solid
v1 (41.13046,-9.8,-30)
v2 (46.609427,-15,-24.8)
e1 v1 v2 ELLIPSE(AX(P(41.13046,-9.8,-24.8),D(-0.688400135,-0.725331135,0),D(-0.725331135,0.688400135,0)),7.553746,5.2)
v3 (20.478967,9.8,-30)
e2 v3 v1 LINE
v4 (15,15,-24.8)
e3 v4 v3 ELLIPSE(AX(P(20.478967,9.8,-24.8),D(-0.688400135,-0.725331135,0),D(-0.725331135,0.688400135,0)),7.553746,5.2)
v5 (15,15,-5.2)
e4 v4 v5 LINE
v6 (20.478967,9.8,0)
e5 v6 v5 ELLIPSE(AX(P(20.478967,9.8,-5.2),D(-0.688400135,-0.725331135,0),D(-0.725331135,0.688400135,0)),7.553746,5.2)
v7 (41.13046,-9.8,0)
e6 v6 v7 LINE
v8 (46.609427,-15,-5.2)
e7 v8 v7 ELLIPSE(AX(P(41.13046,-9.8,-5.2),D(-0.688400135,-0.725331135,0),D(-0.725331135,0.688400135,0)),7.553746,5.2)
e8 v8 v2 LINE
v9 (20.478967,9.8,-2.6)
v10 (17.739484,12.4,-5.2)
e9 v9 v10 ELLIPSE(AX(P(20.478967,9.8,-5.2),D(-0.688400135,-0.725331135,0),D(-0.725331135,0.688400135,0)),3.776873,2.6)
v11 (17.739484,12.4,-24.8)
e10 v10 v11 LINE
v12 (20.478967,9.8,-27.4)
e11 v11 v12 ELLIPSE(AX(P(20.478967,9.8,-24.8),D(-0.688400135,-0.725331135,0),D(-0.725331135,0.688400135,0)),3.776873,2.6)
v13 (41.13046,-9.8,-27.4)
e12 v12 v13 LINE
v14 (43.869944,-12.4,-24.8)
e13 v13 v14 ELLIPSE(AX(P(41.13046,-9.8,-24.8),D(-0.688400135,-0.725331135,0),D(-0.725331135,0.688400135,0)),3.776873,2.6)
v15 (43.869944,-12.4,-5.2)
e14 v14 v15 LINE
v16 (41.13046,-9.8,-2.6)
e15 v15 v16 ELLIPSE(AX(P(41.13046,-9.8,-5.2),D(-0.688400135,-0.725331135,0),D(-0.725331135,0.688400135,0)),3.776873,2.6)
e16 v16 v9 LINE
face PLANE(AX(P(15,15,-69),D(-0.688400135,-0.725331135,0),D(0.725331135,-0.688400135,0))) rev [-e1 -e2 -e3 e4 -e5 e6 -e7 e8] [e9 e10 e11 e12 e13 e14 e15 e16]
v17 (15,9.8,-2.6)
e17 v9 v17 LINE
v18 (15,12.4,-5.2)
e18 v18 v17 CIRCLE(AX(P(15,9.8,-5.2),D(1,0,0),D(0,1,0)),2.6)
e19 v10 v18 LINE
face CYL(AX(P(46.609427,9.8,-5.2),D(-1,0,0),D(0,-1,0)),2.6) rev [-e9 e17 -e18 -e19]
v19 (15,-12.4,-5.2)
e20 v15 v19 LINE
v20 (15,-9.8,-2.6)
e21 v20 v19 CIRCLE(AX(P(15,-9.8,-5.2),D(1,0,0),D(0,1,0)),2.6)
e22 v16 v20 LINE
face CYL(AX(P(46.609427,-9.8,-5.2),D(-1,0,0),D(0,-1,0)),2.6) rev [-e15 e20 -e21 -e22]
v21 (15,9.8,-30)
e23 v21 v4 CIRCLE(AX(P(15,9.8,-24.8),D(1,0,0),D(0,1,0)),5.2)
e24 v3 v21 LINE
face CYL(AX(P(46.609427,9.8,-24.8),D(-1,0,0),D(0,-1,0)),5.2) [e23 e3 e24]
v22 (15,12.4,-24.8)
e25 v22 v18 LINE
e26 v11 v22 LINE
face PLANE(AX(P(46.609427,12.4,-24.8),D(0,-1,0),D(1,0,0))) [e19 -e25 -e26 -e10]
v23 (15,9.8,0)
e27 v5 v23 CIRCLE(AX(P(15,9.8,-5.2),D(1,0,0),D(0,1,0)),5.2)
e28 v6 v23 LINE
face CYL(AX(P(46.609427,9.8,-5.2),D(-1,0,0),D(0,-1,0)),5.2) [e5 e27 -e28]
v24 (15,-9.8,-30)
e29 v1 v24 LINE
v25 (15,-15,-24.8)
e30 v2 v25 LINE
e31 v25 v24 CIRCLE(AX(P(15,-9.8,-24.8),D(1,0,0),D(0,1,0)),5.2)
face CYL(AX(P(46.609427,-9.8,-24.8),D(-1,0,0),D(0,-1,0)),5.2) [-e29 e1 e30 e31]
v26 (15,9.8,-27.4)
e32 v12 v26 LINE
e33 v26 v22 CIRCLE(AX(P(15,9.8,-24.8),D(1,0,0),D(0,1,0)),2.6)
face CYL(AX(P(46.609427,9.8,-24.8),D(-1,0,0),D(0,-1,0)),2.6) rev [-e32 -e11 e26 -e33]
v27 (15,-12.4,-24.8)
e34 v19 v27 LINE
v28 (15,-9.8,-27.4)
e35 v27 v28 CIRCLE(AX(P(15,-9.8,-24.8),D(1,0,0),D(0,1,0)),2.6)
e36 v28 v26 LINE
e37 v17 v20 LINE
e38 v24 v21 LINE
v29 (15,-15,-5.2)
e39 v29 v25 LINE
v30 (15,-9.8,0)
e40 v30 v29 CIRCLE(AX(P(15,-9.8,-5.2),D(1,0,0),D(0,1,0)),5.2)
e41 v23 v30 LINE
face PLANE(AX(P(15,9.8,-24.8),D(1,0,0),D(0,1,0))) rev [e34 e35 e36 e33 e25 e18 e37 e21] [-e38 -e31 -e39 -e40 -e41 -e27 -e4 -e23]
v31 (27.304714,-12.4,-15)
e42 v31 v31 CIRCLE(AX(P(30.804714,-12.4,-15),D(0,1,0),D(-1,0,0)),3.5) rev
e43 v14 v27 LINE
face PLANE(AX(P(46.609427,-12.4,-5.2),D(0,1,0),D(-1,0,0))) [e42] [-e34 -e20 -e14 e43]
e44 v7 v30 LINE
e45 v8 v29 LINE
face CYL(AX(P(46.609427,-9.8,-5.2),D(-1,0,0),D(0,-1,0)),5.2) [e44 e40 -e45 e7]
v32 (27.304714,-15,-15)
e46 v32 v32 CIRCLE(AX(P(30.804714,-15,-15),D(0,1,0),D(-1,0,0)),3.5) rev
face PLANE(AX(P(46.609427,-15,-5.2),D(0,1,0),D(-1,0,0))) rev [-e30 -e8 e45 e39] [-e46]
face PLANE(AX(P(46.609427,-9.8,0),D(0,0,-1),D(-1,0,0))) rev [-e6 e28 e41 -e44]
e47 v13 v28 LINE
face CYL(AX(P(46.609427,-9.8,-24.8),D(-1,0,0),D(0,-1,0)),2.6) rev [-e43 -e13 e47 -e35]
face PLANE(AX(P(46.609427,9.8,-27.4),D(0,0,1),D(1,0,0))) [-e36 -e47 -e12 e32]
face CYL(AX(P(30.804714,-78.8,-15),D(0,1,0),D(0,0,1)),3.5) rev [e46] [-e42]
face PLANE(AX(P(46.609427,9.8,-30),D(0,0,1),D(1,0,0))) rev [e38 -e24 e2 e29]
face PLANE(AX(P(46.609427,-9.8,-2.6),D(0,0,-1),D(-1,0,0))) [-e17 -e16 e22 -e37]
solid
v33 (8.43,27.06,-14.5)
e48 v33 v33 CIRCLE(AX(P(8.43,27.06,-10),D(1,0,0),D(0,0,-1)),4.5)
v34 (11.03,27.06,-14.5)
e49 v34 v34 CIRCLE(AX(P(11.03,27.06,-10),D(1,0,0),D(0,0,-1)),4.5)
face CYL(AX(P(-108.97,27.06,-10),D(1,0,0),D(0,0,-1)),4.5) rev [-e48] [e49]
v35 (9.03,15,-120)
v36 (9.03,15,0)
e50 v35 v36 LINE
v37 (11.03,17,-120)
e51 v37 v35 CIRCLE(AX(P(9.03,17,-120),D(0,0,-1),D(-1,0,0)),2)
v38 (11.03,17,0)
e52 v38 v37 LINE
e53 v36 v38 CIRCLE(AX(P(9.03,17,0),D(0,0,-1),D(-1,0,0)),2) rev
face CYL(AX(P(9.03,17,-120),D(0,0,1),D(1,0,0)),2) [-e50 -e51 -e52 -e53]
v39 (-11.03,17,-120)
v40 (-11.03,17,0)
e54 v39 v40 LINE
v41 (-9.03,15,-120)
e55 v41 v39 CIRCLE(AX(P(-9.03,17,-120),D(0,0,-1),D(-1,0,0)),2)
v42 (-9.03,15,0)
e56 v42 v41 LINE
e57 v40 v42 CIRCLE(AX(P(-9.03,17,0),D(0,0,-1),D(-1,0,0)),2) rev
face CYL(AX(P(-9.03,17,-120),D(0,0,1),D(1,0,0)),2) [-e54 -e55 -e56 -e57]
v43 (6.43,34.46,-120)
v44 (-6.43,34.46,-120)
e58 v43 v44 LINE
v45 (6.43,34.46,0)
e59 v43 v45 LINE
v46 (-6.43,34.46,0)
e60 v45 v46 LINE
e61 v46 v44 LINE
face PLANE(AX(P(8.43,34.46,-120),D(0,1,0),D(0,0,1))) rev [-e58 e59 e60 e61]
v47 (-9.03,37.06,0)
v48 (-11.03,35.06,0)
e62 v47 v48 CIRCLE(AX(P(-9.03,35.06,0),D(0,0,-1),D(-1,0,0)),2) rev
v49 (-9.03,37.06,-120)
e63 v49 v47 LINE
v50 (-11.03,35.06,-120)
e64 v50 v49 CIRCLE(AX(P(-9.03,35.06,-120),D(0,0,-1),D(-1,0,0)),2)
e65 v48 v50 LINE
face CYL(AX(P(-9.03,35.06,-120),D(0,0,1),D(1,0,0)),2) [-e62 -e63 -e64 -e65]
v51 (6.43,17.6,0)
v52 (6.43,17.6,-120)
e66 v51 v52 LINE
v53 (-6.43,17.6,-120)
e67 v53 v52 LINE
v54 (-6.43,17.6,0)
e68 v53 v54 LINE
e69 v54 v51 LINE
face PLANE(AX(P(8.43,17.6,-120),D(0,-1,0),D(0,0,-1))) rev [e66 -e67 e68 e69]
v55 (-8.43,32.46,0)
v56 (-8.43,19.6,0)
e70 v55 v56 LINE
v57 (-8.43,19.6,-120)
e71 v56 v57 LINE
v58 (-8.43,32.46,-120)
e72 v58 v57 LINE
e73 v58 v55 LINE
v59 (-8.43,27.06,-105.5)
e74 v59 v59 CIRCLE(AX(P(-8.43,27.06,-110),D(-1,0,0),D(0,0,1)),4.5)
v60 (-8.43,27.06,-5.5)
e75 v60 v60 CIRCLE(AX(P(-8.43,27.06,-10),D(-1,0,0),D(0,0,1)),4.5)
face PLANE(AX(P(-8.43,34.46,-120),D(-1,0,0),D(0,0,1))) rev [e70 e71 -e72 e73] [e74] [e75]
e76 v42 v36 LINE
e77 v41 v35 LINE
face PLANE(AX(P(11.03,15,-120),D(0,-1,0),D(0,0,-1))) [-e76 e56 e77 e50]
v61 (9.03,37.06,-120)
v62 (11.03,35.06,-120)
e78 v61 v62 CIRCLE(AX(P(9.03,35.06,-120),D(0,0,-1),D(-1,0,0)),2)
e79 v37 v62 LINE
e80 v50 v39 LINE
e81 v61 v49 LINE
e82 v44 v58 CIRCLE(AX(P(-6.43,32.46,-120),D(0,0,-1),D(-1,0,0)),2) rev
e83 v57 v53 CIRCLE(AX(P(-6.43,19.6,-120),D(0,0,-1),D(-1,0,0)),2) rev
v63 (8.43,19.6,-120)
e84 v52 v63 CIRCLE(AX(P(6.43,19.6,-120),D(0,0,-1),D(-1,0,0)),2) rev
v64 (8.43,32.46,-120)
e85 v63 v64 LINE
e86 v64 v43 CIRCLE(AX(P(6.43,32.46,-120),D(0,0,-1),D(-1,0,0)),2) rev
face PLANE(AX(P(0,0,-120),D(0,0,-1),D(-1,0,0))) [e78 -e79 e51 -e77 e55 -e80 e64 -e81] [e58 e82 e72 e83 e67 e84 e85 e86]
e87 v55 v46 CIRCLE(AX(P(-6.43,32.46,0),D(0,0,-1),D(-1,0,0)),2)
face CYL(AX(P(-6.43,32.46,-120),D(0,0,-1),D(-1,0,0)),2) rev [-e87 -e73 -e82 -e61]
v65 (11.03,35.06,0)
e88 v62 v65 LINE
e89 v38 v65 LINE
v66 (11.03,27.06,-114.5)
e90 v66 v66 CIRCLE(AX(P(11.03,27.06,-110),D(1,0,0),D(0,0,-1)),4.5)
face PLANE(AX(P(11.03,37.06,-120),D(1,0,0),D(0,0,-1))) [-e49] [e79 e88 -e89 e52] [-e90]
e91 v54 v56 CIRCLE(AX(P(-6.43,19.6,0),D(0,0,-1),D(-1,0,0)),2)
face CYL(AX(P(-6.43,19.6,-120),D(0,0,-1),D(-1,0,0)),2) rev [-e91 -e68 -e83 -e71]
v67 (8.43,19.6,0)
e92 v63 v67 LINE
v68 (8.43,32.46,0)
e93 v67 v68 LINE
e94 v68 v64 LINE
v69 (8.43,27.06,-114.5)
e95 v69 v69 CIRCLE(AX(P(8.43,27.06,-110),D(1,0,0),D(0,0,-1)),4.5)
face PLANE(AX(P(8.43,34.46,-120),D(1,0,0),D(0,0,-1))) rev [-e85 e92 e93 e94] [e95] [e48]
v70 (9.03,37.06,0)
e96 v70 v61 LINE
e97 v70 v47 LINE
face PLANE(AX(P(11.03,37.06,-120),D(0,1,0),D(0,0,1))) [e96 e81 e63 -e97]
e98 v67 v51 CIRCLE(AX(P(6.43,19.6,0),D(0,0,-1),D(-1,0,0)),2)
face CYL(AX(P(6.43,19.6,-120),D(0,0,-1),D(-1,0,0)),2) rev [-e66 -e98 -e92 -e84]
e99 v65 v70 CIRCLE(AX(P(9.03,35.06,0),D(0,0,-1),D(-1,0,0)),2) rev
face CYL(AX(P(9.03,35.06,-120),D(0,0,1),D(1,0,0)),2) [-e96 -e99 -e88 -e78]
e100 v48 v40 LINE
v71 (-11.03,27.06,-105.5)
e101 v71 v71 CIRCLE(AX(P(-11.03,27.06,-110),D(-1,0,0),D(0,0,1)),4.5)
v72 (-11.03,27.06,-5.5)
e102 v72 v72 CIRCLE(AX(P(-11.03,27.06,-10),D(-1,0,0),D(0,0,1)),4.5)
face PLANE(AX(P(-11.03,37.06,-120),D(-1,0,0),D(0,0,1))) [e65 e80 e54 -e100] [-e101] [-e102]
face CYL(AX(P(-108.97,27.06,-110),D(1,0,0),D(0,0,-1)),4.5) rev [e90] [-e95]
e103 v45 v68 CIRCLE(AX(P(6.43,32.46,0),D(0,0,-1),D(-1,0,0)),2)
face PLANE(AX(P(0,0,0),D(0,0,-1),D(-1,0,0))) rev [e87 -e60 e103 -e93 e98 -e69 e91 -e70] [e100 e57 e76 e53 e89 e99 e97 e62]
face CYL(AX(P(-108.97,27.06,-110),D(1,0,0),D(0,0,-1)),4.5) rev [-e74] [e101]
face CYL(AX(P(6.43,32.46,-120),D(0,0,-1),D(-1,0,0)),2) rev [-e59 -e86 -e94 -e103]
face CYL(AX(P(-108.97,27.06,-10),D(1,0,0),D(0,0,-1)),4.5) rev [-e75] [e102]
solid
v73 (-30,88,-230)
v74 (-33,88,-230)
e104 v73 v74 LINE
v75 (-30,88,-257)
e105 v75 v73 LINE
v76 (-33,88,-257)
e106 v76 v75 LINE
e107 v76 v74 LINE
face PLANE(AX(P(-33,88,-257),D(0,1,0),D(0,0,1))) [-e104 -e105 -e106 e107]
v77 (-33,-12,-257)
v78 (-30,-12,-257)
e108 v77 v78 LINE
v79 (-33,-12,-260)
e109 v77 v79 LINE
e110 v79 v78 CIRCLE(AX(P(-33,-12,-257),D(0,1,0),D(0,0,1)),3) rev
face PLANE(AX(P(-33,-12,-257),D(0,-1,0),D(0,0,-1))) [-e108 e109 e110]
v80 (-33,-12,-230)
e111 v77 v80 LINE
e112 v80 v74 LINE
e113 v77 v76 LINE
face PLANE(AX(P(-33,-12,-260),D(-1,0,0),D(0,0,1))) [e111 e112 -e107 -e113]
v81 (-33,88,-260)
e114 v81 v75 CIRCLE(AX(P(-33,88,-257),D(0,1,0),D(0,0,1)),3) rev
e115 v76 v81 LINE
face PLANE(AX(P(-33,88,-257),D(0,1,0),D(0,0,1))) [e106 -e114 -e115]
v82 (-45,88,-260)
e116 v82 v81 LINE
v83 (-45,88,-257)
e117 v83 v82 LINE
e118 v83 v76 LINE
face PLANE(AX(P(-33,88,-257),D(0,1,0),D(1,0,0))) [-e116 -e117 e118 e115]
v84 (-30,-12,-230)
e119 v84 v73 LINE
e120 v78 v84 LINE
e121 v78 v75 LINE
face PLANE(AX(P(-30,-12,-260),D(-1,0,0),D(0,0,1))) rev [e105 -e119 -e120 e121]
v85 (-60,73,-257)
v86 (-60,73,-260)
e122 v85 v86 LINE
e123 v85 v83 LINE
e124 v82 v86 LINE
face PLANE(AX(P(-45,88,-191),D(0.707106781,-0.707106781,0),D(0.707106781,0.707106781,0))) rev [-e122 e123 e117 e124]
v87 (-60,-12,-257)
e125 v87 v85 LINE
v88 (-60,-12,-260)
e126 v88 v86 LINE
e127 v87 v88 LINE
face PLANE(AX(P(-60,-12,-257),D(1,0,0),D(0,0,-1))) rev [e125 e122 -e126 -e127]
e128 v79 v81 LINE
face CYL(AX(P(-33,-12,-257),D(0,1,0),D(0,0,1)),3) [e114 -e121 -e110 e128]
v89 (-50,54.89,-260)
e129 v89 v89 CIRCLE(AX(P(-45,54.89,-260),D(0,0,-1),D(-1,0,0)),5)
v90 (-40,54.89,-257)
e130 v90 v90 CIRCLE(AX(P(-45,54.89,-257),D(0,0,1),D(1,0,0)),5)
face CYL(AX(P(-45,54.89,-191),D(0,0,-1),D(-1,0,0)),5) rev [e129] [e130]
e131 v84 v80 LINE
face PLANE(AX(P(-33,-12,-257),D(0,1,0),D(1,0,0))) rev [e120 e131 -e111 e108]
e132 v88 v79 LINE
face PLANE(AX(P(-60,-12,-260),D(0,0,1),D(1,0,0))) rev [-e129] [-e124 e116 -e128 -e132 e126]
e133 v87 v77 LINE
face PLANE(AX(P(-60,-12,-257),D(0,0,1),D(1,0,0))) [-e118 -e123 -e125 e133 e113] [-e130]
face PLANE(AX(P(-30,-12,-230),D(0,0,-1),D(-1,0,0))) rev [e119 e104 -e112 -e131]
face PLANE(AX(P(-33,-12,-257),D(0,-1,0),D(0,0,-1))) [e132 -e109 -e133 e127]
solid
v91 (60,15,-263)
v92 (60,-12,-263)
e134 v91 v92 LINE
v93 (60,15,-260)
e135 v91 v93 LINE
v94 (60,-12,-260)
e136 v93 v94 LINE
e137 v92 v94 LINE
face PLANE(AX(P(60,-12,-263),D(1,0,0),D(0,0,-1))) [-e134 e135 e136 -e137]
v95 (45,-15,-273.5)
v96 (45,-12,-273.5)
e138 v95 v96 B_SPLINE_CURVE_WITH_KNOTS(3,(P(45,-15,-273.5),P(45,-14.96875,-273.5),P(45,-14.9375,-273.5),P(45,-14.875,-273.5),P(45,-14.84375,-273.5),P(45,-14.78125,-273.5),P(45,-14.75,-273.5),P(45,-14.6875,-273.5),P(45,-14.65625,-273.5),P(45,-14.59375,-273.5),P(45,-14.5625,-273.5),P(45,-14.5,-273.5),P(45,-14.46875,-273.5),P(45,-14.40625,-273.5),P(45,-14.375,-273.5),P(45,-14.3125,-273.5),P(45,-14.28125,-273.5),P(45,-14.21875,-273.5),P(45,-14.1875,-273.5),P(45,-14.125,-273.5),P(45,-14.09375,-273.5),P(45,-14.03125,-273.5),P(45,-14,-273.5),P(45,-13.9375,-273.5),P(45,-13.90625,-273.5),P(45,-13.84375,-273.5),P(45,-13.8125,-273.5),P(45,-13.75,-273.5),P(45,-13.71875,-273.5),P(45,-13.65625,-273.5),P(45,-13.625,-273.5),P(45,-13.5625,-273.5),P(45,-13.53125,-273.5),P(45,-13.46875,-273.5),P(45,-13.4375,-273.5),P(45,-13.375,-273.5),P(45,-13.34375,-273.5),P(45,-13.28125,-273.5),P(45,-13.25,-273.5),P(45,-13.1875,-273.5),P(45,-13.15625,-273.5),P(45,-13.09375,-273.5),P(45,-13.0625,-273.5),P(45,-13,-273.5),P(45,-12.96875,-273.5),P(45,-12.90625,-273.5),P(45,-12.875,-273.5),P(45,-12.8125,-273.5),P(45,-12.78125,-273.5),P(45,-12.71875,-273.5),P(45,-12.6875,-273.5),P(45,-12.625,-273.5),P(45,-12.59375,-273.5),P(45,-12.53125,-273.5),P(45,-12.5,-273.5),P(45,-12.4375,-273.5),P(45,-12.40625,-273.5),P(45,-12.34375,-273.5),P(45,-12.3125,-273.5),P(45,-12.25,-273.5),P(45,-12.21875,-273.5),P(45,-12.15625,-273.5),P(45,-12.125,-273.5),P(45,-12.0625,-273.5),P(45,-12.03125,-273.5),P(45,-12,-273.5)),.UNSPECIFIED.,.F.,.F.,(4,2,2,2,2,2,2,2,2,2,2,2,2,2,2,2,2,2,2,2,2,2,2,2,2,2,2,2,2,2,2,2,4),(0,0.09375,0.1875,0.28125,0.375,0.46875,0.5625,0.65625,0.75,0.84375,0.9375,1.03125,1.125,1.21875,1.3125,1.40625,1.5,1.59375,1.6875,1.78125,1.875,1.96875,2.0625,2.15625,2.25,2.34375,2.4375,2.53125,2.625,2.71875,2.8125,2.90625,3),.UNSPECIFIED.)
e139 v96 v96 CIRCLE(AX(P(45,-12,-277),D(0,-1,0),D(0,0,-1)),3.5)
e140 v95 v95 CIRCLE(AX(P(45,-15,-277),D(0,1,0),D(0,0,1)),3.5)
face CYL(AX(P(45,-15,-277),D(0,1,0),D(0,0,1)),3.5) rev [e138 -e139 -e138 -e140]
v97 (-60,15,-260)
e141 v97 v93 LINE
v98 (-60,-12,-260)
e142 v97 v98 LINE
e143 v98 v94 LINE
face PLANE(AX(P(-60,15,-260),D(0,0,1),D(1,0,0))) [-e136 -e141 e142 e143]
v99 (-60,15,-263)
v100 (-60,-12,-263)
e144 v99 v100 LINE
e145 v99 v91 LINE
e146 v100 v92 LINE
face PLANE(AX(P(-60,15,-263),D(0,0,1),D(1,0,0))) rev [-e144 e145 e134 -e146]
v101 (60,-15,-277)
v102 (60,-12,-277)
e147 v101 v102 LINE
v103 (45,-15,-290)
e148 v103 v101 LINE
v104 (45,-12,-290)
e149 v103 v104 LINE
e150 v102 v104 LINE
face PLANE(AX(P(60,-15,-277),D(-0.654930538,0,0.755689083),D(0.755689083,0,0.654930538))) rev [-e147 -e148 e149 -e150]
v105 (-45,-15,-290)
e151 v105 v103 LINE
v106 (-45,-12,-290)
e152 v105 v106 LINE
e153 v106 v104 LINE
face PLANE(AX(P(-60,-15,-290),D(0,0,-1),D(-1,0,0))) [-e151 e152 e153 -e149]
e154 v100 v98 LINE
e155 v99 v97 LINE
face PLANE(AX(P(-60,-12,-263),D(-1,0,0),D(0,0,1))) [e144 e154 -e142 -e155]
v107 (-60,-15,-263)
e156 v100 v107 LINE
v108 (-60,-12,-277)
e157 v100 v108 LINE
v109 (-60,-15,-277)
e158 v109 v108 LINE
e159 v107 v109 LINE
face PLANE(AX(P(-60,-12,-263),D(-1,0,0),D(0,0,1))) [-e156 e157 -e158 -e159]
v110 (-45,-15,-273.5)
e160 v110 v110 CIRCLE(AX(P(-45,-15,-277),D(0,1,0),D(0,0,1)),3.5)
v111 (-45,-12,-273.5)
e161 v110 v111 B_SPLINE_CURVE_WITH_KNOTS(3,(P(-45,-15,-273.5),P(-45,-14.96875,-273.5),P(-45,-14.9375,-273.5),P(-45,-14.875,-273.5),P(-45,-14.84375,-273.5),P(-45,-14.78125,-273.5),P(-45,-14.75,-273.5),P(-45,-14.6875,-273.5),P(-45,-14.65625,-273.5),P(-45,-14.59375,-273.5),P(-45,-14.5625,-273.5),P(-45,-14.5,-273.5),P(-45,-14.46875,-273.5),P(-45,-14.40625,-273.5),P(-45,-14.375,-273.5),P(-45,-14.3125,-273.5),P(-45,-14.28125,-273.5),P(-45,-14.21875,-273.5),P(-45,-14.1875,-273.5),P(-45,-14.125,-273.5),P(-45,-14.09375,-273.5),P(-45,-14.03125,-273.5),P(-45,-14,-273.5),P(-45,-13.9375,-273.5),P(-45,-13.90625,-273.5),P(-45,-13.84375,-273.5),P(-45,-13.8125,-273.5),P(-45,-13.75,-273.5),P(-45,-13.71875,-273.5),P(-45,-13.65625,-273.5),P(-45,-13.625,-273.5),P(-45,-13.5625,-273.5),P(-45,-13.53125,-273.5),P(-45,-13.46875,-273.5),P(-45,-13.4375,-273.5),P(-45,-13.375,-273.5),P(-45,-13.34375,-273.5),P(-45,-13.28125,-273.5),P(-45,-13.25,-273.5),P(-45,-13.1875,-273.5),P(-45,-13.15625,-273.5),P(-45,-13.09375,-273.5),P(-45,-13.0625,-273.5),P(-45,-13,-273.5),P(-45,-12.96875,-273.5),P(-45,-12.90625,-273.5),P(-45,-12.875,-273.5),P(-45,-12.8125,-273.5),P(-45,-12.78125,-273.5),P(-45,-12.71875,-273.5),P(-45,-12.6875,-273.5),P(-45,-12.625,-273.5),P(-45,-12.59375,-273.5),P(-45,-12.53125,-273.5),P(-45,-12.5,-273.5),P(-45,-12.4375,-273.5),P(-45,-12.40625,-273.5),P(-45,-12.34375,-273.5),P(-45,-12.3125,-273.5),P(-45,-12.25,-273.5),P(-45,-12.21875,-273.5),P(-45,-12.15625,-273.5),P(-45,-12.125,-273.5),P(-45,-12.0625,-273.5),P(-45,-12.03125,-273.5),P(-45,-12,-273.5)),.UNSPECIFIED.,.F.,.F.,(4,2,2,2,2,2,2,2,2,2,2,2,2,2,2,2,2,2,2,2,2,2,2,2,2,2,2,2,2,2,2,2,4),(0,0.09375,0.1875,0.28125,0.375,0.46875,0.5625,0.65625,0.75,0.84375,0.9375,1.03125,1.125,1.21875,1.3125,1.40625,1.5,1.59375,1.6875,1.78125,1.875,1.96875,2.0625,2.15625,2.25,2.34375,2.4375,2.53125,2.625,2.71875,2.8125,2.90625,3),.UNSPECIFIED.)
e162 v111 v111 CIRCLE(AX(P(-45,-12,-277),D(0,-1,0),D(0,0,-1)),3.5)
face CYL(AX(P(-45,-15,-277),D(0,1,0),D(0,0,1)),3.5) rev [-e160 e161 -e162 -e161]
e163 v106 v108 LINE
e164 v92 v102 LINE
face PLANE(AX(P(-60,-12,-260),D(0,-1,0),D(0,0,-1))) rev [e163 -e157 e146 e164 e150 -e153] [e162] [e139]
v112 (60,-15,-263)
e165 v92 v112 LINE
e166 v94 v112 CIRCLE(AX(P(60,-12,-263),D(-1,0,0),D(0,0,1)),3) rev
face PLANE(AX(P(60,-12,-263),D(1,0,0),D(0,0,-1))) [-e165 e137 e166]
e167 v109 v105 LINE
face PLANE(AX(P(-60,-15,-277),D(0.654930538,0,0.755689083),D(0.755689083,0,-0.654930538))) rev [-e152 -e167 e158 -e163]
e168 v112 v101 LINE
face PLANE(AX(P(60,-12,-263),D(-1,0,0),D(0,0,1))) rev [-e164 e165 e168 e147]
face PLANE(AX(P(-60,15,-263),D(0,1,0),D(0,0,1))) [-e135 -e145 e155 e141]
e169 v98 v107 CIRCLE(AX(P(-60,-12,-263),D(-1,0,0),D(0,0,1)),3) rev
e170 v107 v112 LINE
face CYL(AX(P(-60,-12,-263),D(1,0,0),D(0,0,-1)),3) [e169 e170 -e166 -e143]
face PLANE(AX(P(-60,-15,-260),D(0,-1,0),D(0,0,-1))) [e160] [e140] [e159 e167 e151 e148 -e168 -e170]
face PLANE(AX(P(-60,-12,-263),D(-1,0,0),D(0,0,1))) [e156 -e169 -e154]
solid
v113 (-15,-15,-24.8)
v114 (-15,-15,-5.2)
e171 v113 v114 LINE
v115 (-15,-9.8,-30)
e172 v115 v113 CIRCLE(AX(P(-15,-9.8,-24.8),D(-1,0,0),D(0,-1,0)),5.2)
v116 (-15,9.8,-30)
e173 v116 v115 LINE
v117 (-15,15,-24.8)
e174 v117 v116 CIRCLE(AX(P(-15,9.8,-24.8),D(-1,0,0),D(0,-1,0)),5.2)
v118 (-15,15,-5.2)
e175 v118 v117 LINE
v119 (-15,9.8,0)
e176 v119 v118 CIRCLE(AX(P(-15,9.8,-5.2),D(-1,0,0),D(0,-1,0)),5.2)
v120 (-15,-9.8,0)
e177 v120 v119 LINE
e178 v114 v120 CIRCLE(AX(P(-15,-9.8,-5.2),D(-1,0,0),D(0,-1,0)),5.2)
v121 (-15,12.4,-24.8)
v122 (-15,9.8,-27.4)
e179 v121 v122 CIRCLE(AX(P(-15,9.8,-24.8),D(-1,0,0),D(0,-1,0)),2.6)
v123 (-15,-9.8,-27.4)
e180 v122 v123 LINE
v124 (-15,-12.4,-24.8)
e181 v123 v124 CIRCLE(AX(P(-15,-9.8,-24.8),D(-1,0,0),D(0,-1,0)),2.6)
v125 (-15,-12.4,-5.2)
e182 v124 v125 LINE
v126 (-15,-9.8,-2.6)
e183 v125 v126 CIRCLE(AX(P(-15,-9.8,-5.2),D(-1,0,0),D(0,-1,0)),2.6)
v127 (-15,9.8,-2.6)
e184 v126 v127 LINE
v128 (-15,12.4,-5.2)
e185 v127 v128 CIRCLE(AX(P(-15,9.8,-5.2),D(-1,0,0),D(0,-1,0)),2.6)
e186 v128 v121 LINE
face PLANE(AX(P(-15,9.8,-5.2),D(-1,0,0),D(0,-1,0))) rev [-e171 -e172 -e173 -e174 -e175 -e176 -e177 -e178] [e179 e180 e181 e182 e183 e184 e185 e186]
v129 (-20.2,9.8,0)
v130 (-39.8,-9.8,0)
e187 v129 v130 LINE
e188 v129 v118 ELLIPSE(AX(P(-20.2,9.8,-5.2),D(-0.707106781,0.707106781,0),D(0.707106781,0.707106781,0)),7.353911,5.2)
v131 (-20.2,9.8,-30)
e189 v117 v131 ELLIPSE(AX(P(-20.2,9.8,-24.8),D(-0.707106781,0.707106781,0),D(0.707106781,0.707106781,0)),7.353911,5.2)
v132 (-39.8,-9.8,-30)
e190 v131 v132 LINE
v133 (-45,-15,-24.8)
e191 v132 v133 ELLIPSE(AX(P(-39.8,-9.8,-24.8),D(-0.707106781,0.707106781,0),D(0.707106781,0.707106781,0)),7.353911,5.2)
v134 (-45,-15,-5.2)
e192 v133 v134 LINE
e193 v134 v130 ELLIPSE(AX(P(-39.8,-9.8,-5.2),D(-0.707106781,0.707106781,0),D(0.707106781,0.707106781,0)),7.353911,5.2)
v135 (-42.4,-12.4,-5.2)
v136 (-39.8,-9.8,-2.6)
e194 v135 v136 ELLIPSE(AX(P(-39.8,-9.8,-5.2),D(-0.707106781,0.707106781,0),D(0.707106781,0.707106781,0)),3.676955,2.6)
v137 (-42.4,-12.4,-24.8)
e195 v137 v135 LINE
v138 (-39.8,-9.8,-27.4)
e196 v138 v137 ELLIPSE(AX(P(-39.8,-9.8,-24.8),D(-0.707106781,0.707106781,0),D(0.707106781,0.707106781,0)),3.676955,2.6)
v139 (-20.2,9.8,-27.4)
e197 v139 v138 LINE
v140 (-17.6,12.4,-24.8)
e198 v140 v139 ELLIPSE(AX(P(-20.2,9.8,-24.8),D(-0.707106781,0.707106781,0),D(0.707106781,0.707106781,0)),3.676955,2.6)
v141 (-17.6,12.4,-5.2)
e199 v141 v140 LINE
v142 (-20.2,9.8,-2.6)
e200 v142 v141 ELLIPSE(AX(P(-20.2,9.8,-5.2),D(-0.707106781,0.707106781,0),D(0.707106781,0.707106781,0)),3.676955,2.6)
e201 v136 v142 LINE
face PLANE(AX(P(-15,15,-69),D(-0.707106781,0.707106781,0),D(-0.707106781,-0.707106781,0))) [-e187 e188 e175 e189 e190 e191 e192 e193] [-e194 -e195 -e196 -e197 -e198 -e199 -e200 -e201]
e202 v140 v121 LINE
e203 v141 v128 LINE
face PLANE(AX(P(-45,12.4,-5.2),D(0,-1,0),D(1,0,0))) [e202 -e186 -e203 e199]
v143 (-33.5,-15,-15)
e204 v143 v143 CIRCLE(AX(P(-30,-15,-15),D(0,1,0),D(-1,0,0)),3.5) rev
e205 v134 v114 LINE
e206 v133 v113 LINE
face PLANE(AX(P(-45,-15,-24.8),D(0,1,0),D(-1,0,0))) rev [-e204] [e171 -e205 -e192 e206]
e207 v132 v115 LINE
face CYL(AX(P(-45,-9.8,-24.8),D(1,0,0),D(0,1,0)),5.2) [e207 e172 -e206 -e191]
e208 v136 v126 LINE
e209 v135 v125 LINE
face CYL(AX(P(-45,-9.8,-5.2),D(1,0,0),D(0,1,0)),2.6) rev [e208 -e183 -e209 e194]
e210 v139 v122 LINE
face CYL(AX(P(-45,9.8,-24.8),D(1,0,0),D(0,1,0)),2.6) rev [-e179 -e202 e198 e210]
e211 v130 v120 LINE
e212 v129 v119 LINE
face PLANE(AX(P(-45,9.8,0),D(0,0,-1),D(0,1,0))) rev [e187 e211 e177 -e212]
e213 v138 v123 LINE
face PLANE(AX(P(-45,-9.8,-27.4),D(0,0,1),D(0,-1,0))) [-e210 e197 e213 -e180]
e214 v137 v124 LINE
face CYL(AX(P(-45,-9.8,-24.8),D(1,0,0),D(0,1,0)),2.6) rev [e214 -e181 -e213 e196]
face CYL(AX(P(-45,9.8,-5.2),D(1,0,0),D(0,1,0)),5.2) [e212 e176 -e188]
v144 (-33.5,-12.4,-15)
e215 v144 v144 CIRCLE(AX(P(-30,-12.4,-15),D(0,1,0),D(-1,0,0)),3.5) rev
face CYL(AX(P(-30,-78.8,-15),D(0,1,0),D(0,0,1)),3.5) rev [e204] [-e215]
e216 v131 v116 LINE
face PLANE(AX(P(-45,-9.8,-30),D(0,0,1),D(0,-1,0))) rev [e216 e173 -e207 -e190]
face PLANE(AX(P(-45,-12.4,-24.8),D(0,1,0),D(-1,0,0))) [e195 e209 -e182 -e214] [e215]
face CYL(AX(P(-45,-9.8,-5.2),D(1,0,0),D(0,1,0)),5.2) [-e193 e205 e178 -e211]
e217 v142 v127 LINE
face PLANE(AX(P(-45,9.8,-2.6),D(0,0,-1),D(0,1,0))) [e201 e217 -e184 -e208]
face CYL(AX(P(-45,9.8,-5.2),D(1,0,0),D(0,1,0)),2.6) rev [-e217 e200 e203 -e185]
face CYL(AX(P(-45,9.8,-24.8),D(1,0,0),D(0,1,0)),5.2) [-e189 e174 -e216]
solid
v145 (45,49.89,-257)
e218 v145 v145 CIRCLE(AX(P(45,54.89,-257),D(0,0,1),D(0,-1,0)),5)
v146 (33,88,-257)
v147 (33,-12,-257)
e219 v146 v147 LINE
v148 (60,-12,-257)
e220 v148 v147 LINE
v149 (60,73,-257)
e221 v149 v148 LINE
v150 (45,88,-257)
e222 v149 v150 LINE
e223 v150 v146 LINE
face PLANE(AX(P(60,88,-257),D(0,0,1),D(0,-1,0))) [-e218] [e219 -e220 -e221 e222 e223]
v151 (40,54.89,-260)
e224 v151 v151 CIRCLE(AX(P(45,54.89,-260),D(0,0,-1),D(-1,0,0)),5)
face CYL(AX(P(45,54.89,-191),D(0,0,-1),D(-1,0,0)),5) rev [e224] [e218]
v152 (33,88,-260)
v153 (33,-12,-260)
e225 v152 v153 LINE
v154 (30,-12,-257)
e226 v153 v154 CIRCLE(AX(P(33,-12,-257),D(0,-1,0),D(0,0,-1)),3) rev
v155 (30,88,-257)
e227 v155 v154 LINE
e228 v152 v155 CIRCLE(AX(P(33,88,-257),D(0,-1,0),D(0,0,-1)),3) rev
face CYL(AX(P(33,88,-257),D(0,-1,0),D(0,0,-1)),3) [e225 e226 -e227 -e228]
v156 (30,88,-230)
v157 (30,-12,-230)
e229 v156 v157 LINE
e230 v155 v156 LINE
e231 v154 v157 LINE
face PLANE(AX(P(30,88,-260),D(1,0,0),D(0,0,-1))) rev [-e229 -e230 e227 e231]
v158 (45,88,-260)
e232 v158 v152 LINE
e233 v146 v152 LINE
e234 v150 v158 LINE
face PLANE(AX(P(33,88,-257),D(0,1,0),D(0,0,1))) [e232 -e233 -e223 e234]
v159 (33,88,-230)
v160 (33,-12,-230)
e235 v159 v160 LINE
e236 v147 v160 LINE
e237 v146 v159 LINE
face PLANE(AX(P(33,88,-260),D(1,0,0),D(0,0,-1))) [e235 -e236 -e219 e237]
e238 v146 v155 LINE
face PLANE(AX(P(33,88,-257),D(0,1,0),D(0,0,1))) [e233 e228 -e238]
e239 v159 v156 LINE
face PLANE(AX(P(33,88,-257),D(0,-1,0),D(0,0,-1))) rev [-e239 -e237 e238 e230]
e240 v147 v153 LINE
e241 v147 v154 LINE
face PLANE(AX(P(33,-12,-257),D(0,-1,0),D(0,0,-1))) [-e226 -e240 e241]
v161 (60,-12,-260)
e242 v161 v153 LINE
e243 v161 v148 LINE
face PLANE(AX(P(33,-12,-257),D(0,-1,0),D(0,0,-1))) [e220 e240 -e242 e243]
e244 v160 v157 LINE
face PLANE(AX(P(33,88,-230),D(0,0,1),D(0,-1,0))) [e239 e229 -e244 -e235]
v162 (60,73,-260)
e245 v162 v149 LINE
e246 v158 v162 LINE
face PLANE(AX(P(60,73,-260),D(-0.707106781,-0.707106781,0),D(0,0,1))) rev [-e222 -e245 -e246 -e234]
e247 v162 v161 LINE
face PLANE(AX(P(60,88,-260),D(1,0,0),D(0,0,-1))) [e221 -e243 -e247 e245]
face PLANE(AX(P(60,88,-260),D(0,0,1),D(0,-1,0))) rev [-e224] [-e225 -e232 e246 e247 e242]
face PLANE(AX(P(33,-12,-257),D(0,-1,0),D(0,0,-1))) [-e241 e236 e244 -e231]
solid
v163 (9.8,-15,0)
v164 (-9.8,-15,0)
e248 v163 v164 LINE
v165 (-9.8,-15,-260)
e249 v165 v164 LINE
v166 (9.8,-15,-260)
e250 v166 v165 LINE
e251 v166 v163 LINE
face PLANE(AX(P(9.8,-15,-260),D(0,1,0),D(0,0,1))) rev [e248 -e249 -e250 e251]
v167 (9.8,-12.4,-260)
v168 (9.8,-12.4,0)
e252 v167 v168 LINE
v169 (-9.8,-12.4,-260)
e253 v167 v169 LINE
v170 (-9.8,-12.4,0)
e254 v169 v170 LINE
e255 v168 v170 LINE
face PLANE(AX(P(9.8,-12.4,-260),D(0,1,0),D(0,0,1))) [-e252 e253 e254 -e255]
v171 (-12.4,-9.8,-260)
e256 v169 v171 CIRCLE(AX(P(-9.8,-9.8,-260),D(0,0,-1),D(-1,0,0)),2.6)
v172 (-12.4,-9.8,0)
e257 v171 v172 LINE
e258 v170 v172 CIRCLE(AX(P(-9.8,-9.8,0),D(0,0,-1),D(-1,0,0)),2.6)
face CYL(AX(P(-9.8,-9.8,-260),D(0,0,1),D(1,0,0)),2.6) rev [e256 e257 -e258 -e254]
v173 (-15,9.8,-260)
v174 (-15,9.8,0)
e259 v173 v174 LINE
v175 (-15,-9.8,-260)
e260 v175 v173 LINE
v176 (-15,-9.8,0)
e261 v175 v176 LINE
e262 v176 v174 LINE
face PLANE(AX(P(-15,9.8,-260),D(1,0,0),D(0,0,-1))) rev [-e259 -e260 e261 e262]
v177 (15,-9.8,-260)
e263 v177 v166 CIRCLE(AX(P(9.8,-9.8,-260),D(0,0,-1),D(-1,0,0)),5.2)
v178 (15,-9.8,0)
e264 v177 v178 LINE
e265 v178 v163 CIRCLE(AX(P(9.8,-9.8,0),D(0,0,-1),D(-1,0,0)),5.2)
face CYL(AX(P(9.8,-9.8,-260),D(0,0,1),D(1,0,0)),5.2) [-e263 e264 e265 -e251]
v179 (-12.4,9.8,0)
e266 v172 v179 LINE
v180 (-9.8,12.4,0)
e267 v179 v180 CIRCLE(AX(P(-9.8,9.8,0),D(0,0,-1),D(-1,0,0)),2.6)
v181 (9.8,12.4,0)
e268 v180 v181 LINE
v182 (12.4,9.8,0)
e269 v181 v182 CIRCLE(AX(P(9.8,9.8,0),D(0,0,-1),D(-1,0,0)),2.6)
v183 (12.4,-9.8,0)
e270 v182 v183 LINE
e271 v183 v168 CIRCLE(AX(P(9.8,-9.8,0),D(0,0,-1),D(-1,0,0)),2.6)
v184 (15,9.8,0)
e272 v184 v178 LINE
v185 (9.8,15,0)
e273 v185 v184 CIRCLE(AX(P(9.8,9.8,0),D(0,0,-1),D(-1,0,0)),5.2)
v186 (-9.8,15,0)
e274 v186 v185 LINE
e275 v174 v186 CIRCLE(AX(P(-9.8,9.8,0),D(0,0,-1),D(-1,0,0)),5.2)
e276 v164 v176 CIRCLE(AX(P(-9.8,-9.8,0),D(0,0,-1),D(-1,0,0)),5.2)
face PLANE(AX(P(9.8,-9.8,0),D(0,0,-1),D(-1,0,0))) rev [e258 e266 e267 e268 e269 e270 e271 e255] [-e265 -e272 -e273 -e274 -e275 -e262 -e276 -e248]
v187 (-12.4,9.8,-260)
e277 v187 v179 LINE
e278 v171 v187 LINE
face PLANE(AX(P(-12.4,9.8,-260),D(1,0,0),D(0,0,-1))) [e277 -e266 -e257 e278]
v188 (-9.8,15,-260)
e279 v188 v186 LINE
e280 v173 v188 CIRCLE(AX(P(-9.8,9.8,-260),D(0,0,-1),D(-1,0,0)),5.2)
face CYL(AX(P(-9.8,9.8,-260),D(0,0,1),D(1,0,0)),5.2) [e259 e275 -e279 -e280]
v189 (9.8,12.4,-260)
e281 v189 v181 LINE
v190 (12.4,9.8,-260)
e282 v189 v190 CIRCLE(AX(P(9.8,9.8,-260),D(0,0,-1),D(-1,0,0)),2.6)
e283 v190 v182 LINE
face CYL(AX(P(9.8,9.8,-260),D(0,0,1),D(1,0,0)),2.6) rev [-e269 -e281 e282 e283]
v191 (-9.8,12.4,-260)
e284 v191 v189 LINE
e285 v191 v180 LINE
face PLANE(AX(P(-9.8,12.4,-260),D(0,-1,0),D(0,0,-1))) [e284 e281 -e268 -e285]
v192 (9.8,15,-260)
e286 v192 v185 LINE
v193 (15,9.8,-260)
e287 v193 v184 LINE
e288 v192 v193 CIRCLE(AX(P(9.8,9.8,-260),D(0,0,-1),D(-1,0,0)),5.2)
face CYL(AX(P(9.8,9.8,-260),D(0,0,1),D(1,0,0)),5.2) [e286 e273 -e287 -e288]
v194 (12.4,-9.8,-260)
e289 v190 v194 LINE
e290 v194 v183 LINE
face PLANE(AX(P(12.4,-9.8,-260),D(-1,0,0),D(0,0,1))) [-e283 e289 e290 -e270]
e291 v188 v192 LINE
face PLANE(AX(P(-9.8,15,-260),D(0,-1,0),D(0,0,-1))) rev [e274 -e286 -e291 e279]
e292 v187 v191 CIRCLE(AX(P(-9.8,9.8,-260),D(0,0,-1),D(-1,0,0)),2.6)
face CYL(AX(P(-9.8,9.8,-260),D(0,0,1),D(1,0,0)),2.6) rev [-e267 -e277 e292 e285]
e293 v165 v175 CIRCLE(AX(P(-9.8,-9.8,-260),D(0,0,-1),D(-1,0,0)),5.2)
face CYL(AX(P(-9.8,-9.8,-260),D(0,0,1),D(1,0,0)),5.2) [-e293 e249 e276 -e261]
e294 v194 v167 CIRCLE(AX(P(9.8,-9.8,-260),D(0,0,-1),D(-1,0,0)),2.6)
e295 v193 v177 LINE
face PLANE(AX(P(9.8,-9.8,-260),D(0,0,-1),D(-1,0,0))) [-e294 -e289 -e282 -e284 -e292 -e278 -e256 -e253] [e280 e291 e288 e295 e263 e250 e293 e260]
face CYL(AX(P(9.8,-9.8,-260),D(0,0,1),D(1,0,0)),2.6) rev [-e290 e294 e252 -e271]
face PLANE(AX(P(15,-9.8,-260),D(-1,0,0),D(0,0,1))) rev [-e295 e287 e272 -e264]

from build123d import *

# Parameters (mm, degrees)
SQUARE_TUBE_30_X_30_X_2_6_1_DEPTH   = 260
SQUARE_TUBE_30_X_30_X_2_6_1_2_DEPTH = 120
SKETCH2_R                           = 4.5
CUT_EXTRUDE1_DEPTH                  = 69
SQUARE_TUBE_30_X_30_X_2_6_4_DEPTH   = 30
CUT_EXTRUDE2_DEPTH                  = 69
SQUARE_TUBE_30_X_30_X_2_6_5_DEPTH   = 31.609427342
CUT_EXTRUDE3_DEPTH                  = 69
SKETCH19_R                          = 3.5
CUT_EXTRUDE6_DEPTH                  = 69
BASE_FLANGE4_START                  = -75
BASE_FLANGE4_DEPTH                  = 120
CUT_EXTRUDE7_DEPTH                  = 69
CUT_EXTRUDE7_DEPTH_BACK             = 302.577519056
SKETCH38_R                          = 3.5
BASE_FLANGE5_START                  = -27
BASE_FLANGE5_DEPTH                  = 100
BASE_FLANGE8_DEPTH                  = 100
SKETCH56_R                          = 5
CUT_EXTRUDE9_DEPTH                  = 69
CUT_EXTRUDE10_DEPTH                 = 69
CHAMFER2_SIZE                       = 15
SKETCH63_R                          = 5
CUT_EXTRUDE11_DEPTH                 = 69
SKETCH64_W                          = 22.06
SKETCH64_H                          = 22.06
SKETCH64_W_2                        = 16.86
SKETCH64_H_2                        = 16.86
BOSS_EXTRUDE1_DEPTH                 = 120
FILLET2_R                           = 2
FILLET3_R                           = 2
SKETCH65_R                          = 4.5
CUT_EXTRUDE12_DEPTH                 = 120


# Read off the part's stored shape, not the designer's step: Base-Flange4, Base-Flange5, Base-Flange8
with BuildPart() as part:
    # Sketch1 → Square tube 30 X 30 X 2.6(1) (new body)
    with BuildSketch(Plane(origin=(0, 0, 0), x_dir=(1, 0, 0), z_dir=(0, 0, -1))):
        with BuildLine():
            Line((-9.8, -15), (9.8, -15))
            ThreePointArc((9.8, -15), (13.476955262, -13.476955262), (15, -9.8))
            Line((15, -9.8), (15, 9.8))
            ThreePointArc((15, 9.8), (13.476955262, 13.476955262), (9.8, 15))
            Line((9.8, 15), (-9.8, 15))
            ThreePointArc((-9.8, 15), (-13.476955262, 13.476955262), (-15, 9.8))
            Line((-15, 9.8), (-15, -9.8))
            ThreePointArc((-15, -9.8), (-13.476955262, -13.476955262), (-9.8, -15))
        make_face()
        with BuildLine():
            Line((-9.8, -12.4), (9.8, -12.4))
            ThreePointArc((9.8, -12.4), (11.638477631, -11.638477631), (12.4, -9.8))
            Line((12.4, -9.8), (12.4, 9.8))
            ThreePointArc((12.4, 9.8), (11.638477631, 11.638477631), (9.8, 12.4))
            Line((9.8, 12.4), (-9.8, 12.4))
            ThreePointArc((-9.8, 12.4), (-11.638477631, 11.638477631), (-12.4, 9.8))
            Line((-12.4, 9.8), (-12.4, -9.8))
            ThreePointArc((-12.4, -9.8), (-11.638477631, -11.638477631), (-9.8, -12.4))
        make_face(mode=Mode.SUBTRACT)
    extrude(amount=SQUARE_TUBE_30_X_30_X_2_6_1_DEPTH)


with BuildPart() as body_2:
    # Sketch1 on segment 2 (carried to segment 2) → Square tube 30 X 30 X 2.6_1 2 (new body)
    with BuildSketch(Plane(origin=(0, 30, 0), x_dir=(1, 0, 0), z_dir=(0, 0, -1))):
        with BuildLine():
            Line((-9.8, -15), (9.8, -15))
            ThreePointArc((9.8, -15), (13.476955262, -13.476955262), (15, -9.8))
            Line((15, -9.8), (15, 9.8))
            ThreePointArc((15, 9.8), (13.476955262, 13.476955262), (9.8, 15))
            Line((9.8, 15), (-9.8, 15))
            ThreePointArc((-9.8, 15), (-13.476955262, 13.476955262), (-15, 9.8))
            Line((-15, 9.8), (-15, -9.8))
            ThreePointArc((-15, -9.8), (-13.476955262, -13.476955262), (-9.8, -15))
        make_face()
        with BuildLine():
            Line((-9.8, -12.4), (9.8, -12.4))
            ThreePointArc((9.8, -12.4), (11.638477631, -11.638477631), (12.4, -9.8))
            Line((12.4, -9.8), (12.4, 9.8))
            ThreePointArc((12.4, 9.8), (11.638477631, 11.638477631), (9.8, 12.4))
            Line((9.8, 12.4), (-9.8, 12.4))
            ThreePointArc((-9.8, 12.4), (-11.638477631, 11.638477631), (-12.4, 9.8))
            Line((-12.4, 9.8), (-12.4, -9.8))
            ThreePointArc((-12.4, -9.8), (-11.638477631, -11.638477631), (-9.8, -12.4))
        make_face(mode=Mode.SUBTRACT)
    extrude(amount=SQUARE_TUBE_30_X_30_X_2_6_1_2_DEPTH)

    # Sketch2 → Cut-Extrude1 (cut)
    with BuildSketch(Plane.ZY.offset(15)):
        with Locations((-110, 35)):
            Circle(SKETCH2_R)
        with Locations((-10, 35)):
            Circle(SKETCH2_R)
    extrude(amount=-CUT_EXTRUDE1_DEPTH, mode=Mode.SUBTRACT)


with BuildPart() as body_3:
    # Sketch11 → Square tube 30 X 30 X 2.6(4) (new body)
    with BuildSketch(Plane(origin=(-15, 0, -15), x_dir=(0, 0, 1), z_dir=(-1, 0, 0))):
        with BuildLine():
            Line((-9.8, -15), (9.8, -15))
            ThreePointArc((9.8, -15), (13.476955262, -13.476955262), (15, -9.8))
            Line((15, -9.8), (15, 9.8))
            ThreePointArc((15, 9.8), (13.476955262, 13.476955262), (9.8, 15))
            Line((9.8, 15), (-9.8, 15))
            ThreePointArc((-9.8, 15), (-13.476955262, 13.476955262), (-15, 9.8))
            Line((-15, 9.8), (-15, -9.8))
            ThreePointArc((-15, -9.8), (-13.476955262, -13.476955262), (-9.8, -15))
        make_face()
        with BuildLine():
            Line((-9.8, -12.4), (9.8, -12.4))
            ThreePointArc((9.8, -12.4), (11.638477631, -11.638477631), (12.4, -9.8))
            Line((12.4, -9.8), (12.4, 9.8))
            ThreePointArc((12.4, 9.8), (11.638477631, 11.638477631), (9.8, 12.4))
            Line((9.8, 12.4), (-9.8, 12.4))
            ThreePointArc((-9.8, 12.4), (-11.638477631, 11.638477631), (-12.4, 9.8))
            Line((-12.4, 9.8), (-12.4, -9.8))
            ThreePointArc((-12.4, -9.8), (-11.638477631, -11.638477631), (-9.8, -12.4))
        make_face(mode=Mode.SUBTRACT)
    extrude(amount=SQUARE_TUBE_30_X_30_X_2_6_4_DEPTH)

    # Sketch15 → Cut-Extrude2 (cut)
    with BuildSketch(Plane.XY):
        Polygon((-15, 15), (-45, -15), (-45, 15), align=None)
    extrude(amount=-CUT_EXTRUDE2_DEPTH, mode=Mode.SUBTRACT)


with BuildPart() as body_4:
    # Sketch12 → Square tube 30 X 30 X 2.6(5) (new body)
    with BuildSketch(Plane(origin=(15, 0, -15), x_dir=(0, 0, -1), z_dir=(1, 0, 0))):
        with BuildLine():
            Line((-9.8, -15), (9.8, -15))
            ThreePointArc((9.8, -15), (13.476955262, -13.476955262), (15, -9.8))
            Line((15, -9.8), (15, 9.8))
            ThreePointArc((15, 9.8), (13.476955262, 13.476955262), (9.8, 15))
            Line((9.8, 15), (-9.8, 15))
            ThreePointArc((-9.8, 15), (-13.476955262, 13.476955262), (-15, 9.8))
            Line((-15, 9.8), (-15, -9.8))
            ThreePointArc((-15, -9.8), (-13.476955262, -13.476955262), (-9.8, -15))
        make_face()
        with BuildLine():
            Line((-9.8, -12.4), (9.8, -12.4))
            ThreePointArc((9.8, -12.4), (11.638477631, -11.638477631), (12.4, -9.8))
            Line((12.4, -9.8), (12.4, 9.8))
            ThreePointArc((12.4, 9.8), (11.638477631, 11.638477631), (9.8, 12.4))
            Line((9.8, 12.4), (-9.8, 12.4))
            ThreePointArc((-9.8, 12.4), (-11.638477631, 11.638477631), (-12.4, 9.8))
            Line((-12.4, 9.8), (-12.4, -9.8))
            ThreePointArc((-12.4, -9.8), (-11.638477631, -11.638477631), (-9.8, -12.4))
        make_face(mode=Mode.SUBTRACT)
    extrude(amount=SQUARE_TUBE_30_X_30_X_2_6_5_DEPTH)

    # Sketch16 → Cut-Extrude3 (cut)
    with BuildSketch(Plane.XY):
        Polygon((46.609427342, -15), (46.609427342, 15), (15, 15), align=None)
    extrude(amount=-CUT_EXTRUDE3_DEPTH, mode=Mode.SUBTRACT)


with BuildPart() as cut_extrude6_tool:
    # Sketch19 → Cut-Extrude6 (new body)
    with BuildSketch(Plane(origin=(0, -9.8, 0), x_dir=(-1, 0, 0), z_dir=(0, -1, 0))):
        with Locations((30, 15)):
            Circle(SKETCH19_R)
        with Locations((-30.804713671, 15)):
            Circle(SKETCH19_R)
    extrude(amount=CUT_EXTRUDE6_DEPTH)


with BuildPart() as body_3_1:
    add(body_3.part)

    # Cut-Extrude6: cut by cut_extrude6_tool
    add(cut_extrude6_tool.part, mode=Mode.SUBTRACT)


with BuildPart() as body_4_1:
    add(body_4.part)

    # Cut-Extrude6: cut by cut_extrude6_tool
    add(cut_extrude6_tool.part, mode=Mode.SUBTRACT)


with BuildPart() as body_5:
    # Base-Flange4 outline → Base-Flange4 (new body)
    with BuildSketch(Plane.ZY.offset(15).offset(BASE_FLANGE4_START)):
        with BuildLine():
            Line((-263, -12), (-290, -12))
            Line((-290, -12), (-290, -15))
            Line((-290, -15), (-263, -15))
            ThreePointArc((-263, -15), (-260.878679656, -14.121320344), (-260, -12))
            Line((-260, -12), (-260, 15))
            Line((-260, 15), (-263, 15))
            Line((-263, 15), (-263, -12))
        make_face()
    extrude(amount=BASE_FLANGE4_DEPTH)

    # Sketch38 → Cut-Extrude7 (cut, two sides: drawn at the far end of the back side and taken through both)
    with BuildSketch(Plane(origin=(0, -12, 0), x_dir=(1, 0, 0), z_dir=(0, 1, 0)).offset(-CUT_EXTRUDE7_DEPTH_BACK)):
        with Locations(Location((45, 277, 0), (0, 0, 270))):
            Circle(SKETCH38_R)
        with Locations(Location((-45, 277, 0), (0, 0, 270))):
            Circle(SKETCH38_R)
        Polygon((60, 277), (45, 290), (60, 290), align=None)
        Polygon((-60, 277), (-45, 290), (-60, 290), align=None)
    extrude(amount=CUT_EXTRUDE7_DEPTH + CUT_EXTRUDE7_DEPTH_BACK, mode=Mode.SUBTRACT)


with BuildPart() as body_6:
    # Base-Flange5 outline → Base-Flange5 (new body)
    with BuildSketch(Plane(origin=(0, 15, 0), x_dir=(1, 0, 0), z_dir=(0, 1, 0)).offset(BASE_FLANGE5_START)):
        with BuildLine():
            Line((-60, 257), (-33, 257))
            Line((-33, 257), (-33, 230))
            Line((-33, 230), (-30, 230))
            Line((-30, 230), (-30, 257))
            ThreePointArc((-30, 257), (-30.878679656, 259.121320344), (-33, 260))
            Line((-33, 260), (-60, 260))
            Line((-60, 260), (-60, 257))
        make_face()
    extrude(amount=BASE_FLANGE5_DEPTH)

    # Sketch56 → Cut-Extrude9 (cut)
    with BuildSketch(Plane(origin=(0, 0, -260), x_dir=(-1, 0, 0), z_dir=(0, 0, -1))):
        with Locations((45, 54.89)):
            Circle(SKETCH56_R)
    extrude(amount=-CUT_EXTRUDE9_DEPTH, mode=Mode.SUBTRACT)

    # Sketch62 → Cut-Extrude10 (cut)
    with BuildSketch(Plane(origin=(0, 0, -260), x_dir=(-1, 0, 0), z_dir=(0, 0, -1))):
        Polygon((45, 88), (60, 73), (60, 88), align=None)
    extrude(amount=-CUT_EXTRUDE10_DEPTH, mode=Mode.SUBTRACT)


with BuildPart() as body_7:
    # Base-Flange8 outline → Base-Flange8 (new body)
    with BuildSketch(Plane(origin=(0, -12, 0), x_dir=(1, 0, 0), z_dir=(0, 1, 0))):
        with BuildLine():
            Line((30, 257), (30, 230))
            Line((30, 230), (33, 230))
            Line((33, 230), (33, 257))
            Line((33, 257), (60, 257))
            Line((60, 257), (60, 260))
            Line((60, 260), (33, 260))
            ThreePointArc((33, 260), (30.878679656, 259.121320344), (30, 257))
        make_face()
    extrude(amount=BASE_FLANGE8_DEPTH)

    # Chamfer2
    chamfer2_edges = [body_7.edges().sort_by_distance(p)[0] for p in [
        (60, 88, -258.5),
    ]]
    chamfer(chamfer2_edges, length=CHAMFER2_SIZE)

    # Sketch63 → Cut-Extrude11 (cut)
    with BuildSketch(Plane(origin=(0, 0, -260), x_dir=(-1, 0, 0), z_dir=(0, 0, -1))):
        with Locations((-45, 54.89)):
            Circle(SKETCH63_R)
    extrude(amount=-CUT_EXTRUDE11_DEPTH, mode=Mode.SUBTRACT)


with BuildPart() as body_7_2:
    # Sketch64 → Boss-Extrude1 (new body)
    with BuildSketch(Plane.XY):
        with Locations((0, 26.03)):
            Rectangle(SKETCH64_W, SKETCH64_H)
        with Locations((0, 26.03)):
            Rectangle(SKETCH64_W_2, SKETCH64_H_2, mode=Mode.SUBTRACT)
    extrude(amount=-BOSS_EXTRUDE1_DEPTH)

    # Fillet2
    fillet2_edges = [body_7_2.edges().sort_by_distance(p)[0] for p in [
        (-11.03, 37.06, -60),
        (11.03, 37.06, -60),
        (11.03, 15, -60),
        (-11.03, 15, -60),
    ]]
    fillet(fillet2_edges, radius=FILLET2_R)

    # Fillet3
    fillet3_edges = [body_7_2.edges().sort_by_distance(p)[0] for p in [
        (-8.43, 17.6, -60),
        (-8.43, 34.46, -60),
        (8.43, 34.46, -60),
        (8.43, 17.6, -60),
    ]]
    fillet(fillet3_edges, radius=FILLET3_R)

    # Sketch65 → Cut-Extrude12 (cut)
    with BuildSketch(Plane(origin=(11.03, 0, 0), x_dir=(0, 0, -1), z_dir=(1, 0, 0))):
        with Locations((110, 27.06)):
            Circle(SKETCH65_R)
        with Locations((10, 27.06)):
            Circle(SKETCH65_R)
    extrude(amount=-CUT_EXTRUDE12_DEPTH, mode=Mode.SUBTRACT)


solid = Compound([part.part, body_3_1.part, body_4_1.part, body_5.part, body_6.part, body_7.part, body_7_2.part])
